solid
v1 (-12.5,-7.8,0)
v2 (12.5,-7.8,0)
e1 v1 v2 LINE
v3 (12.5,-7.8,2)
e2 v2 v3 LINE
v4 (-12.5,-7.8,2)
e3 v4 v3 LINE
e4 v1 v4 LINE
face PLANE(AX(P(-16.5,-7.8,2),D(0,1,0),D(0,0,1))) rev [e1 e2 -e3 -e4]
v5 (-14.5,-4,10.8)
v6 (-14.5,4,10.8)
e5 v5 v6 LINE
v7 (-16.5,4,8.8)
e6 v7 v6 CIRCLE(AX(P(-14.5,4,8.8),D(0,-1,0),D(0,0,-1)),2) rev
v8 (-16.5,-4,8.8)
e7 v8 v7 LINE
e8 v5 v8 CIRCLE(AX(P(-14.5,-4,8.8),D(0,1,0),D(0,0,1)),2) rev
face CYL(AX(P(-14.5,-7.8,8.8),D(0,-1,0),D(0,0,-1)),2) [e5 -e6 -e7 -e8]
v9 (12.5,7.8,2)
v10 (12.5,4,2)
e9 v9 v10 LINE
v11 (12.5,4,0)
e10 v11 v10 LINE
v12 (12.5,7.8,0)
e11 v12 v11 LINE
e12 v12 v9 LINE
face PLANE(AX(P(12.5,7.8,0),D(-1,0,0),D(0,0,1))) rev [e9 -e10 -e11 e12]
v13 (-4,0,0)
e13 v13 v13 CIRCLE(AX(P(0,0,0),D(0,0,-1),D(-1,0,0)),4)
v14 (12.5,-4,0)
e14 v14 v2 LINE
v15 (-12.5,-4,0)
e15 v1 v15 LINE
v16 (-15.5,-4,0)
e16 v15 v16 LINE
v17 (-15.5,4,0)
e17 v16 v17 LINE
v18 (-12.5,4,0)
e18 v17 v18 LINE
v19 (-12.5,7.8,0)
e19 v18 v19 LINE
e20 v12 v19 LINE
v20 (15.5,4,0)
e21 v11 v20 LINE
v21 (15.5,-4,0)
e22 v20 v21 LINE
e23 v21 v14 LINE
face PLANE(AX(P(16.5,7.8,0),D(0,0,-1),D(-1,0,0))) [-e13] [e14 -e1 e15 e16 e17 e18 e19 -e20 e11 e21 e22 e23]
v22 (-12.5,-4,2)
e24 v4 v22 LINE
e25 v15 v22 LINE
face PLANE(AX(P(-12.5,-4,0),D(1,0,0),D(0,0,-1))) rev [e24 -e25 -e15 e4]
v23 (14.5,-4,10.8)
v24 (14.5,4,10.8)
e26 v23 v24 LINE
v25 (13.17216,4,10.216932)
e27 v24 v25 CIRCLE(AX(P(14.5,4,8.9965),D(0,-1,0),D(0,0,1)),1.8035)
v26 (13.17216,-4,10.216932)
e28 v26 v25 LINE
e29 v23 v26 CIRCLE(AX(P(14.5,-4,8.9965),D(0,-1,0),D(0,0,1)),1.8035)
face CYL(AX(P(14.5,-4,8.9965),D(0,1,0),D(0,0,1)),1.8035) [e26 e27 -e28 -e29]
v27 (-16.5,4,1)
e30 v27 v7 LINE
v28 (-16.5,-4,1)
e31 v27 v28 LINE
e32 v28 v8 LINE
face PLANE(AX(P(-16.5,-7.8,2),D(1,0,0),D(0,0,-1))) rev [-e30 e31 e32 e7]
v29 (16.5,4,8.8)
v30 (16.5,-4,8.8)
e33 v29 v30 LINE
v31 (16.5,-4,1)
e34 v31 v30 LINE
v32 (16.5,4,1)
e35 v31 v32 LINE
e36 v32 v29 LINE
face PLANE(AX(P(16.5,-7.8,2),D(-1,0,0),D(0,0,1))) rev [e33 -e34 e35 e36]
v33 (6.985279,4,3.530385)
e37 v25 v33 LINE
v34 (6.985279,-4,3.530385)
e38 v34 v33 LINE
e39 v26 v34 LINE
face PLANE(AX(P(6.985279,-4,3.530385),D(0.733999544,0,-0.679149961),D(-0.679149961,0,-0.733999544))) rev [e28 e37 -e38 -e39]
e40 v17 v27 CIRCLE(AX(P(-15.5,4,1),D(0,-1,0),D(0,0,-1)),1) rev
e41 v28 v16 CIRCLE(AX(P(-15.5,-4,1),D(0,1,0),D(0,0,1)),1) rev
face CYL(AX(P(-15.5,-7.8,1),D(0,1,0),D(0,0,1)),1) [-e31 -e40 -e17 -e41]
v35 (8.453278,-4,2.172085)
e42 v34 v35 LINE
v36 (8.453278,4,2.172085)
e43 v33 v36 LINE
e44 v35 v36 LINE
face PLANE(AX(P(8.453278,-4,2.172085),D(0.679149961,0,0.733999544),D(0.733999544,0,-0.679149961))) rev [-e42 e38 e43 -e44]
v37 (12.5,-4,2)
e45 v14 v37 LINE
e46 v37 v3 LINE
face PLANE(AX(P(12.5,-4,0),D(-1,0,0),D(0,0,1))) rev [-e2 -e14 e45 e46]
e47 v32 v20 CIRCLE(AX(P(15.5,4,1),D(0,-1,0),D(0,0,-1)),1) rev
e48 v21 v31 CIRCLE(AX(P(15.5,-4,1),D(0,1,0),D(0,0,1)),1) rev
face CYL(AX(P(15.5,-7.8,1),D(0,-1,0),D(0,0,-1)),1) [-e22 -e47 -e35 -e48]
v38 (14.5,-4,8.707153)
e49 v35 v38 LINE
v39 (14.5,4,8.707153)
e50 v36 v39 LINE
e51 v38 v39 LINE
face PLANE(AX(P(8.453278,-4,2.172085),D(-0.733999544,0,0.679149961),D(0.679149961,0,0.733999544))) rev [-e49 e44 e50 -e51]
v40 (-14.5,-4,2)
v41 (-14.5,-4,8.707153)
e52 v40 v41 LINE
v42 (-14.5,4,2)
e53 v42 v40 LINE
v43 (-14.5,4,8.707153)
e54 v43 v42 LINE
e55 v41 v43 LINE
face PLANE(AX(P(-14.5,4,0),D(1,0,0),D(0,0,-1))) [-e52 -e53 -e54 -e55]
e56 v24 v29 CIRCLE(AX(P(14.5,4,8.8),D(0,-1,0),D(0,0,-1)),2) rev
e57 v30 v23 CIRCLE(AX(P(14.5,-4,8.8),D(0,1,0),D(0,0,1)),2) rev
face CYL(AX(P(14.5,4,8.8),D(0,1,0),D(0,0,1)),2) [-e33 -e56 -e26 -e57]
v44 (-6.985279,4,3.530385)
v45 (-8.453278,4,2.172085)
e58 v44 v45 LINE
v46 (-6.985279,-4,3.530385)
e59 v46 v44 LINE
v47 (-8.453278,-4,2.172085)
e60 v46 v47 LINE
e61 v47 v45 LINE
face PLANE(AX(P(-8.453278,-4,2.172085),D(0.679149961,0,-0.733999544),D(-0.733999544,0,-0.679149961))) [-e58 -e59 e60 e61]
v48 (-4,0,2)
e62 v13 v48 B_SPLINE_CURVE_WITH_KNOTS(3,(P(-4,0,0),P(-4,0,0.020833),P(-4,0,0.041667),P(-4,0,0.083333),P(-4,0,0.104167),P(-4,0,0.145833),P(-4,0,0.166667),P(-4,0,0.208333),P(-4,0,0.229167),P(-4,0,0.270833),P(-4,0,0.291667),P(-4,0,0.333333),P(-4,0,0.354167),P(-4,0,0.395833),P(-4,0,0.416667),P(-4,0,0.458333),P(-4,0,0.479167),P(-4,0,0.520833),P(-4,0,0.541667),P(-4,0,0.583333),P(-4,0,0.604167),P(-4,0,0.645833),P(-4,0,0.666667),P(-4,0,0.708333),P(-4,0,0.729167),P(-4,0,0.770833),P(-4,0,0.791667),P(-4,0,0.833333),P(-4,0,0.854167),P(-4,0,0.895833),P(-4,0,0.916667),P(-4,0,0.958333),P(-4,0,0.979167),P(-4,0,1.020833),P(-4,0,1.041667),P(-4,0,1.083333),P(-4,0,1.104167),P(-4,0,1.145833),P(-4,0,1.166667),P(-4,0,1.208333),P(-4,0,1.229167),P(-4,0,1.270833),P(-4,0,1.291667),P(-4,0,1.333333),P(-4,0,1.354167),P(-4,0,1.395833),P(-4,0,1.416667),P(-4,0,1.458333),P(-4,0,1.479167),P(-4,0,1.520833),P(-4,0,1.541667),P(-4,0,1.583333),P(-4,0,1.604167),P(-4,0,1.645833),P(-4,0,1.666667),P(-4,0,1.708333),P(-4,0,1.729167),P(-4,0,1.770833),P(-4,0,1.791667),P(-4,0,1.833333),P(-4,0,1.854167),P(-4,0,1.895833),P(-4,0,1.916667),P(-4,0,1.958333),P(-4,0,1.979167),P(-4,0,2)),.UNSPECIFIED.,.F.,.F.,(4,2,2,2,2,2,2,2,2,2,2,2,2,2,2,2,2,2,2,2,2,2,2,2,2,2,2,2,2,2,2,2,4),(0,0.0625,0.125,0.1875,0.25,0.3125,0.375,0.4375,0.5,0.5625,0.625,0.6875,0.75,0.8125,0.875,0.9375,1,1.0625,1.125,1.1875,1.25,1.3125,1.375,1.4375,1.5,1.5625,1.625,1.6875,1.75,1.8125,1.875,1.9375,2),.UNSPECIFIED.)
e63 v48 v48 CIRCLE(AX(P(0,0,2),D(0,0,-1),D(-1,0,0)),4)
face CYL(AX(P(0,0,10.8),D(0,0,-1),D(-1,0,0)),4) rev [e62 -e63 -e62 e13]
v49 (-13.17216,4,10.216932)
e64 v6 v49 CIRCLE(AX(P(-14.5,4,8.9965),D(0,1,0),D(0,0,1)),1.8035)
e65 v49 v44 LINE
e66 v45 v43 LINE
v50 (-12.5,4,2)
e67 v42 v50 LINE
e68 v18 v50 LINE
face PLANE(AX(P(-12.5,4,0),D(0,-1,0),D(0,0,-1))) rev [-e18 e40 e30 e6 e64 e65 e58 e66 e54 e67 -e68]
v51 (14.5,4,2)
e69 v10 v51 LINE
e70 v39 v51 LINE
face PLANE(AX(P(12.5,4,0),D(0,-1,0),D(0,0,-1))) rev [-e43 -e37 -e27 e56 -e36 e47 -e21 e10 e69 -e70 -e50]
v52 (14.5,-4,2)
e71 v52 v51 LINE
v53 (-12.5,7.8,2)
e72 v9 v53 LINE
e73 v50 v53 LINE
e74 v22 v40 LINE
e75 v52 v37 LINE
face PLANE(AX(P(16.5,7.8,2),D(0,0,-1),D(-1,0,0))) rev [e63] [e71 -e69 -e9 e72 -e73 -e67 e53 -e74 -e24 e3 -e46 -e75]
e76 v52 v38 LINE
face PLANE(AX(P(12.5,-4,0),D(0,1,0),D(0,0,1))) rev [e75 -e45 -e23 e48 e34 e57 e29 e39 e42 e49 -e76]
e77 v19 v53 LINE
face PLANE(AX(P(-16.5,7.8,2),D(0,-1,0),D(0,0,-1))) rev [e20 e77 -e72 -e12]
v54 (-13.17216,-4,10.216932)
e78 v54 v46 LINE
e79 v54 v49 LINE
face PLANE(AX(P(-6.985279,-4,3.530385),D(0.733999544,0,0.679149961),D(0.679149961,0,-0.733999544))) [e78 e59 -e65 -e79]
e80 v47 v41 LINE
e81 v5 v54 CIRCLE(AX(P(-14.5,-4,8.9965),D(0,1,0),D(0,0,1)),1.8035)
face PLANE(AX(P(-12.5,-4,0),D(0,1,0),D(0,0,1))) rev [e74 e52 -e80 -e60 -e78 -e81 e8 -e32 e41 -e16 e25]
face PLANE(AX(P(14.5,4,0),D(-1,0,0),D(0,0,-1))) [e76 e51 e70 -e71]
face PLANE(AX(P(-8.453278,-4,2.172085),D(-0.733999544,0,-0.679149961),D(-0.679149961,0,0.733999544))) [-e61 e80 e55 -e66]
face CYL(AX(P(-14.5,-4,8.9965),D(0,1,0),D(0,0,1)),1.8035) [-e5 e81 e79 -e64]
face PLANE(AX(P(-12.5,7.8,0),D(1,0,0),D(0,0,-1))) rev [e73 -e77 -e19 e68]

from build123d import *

# Parameters (mm, degrees)
SKETCH_1_W          = 33
SKETCH_1_H          = 15.6
EXTRUDE_1_DEPTH     = 2
SKETCH_2_W          = 4
SKETCH_2_H          = 3.8
CUT_EXTRUDE_1_DEPTH = 19.360010893
SKETCH_4_W          = 10.8
SKETCH_4_H          = 8
EXTRUDE_2_DEPTH     = 2
EXTRUDE_4_DEPTH     = 8
SKETCH_6_R          = 4
CUT_EXTRUDE_2_DEPTH = 22.20683852
FILLET_1_R          = 2
FILLET_2_R          = 1


with BuildPart() as part:
    # 草图1 → 凸台-拉伸1 (new body)
    with BuildSketch(Plane.XY):
        Rectangle(SKETCH_1_W, SKETCH_1_H)
    extrude(amount=EXTRUDE_1_DEPTH)

    # 草图2 → 切除-拉伸1 (cut, through all)
    with BuildSketch(Plane.XY.offset(2)):
        with Locations((-14.5, 5.9)):
            Rectangle(SKETCH_2_W, SKETCH_2_H)
        with Locations((14.5, 5.9)):
            Rectangle(SKETCH_2_W, SKETCH_2_H)
        with Locations((-14.5, -5.9)):
            Rectangle(SKETCH_2_W, SKETCH_2_H)
        with Locations((14.5, -5.9)):
            Rectangle(SKETCH_2_W, SKETCH_2_H)
    extrude(amount=-CUT_EXTRUDE_1_DEPTH, mode=Mode.SUBTRACT)

    # 草图4 → 凸台-拉伸2 (add)
    with BuildSketch(Plane.ZY.offset(16.5)):
        with Locations((5.4, 0)):
            Rectangle(SKETCH_4_W, SKETCH_4_H)
    extrude_2 = extrude(amount=-EXTRUDE_2_DEPTH)

    # 草图5 → 凸台-拉伸4 (add)
    with BuildSketch(Plane(origin=(0, 4, 0), x_dir=(1, 0, 0), z_dir=(0, 1, 0))):
        with BuildLine():
            Line((-8.45327815, -2.172085136), (-14.5, -8.707152989))
            Line((-14.5, -8.707152989), (-14.5, -10.8))
            ThreePointArc((-14.5, -10.8), (-13.774891977, -10.64781178), (-13.172160334, -10.216931904))
            Line((-13.172160334, -10.216931904), (-6.985279062, -3.530385058))
            Line((-6.985279062, -3.530385058), (-8.45327815, -2.172085136))
        make_face()
    extrude_4 = extrude(amount=-EXTRUDE_4_DEPTH)

    # 草图6 → 切除-拉伸2 (cut, through all)
    with BuildSketch(Plane(origin=(0, 0, 0), x_dir=(-1, 0, 0), z_dir=(0, 0, -1))):
        Circle(SKETCH_6_R)
    extrude(amount=-CUT_EXTRUDE_2_DEPTH, mode=Mode.SUBTRACT)

    # 镜向2: 凸台-拉伸2 across plane
    add(extrude_2.mirror(Plane(origin=(0, 0, 0), x_dir=(0, 0, 1), z_dir=(1, 0, 0))))

    # 镜向3: 凸台-拉伸4 across plane
    add(extrude_4.mirror(Plane(origin=(0, 0, 0), x_dir=(0, 0, 1), z_dir=(1, 0, 0))))

    # 圆角1
    fillet_1_edges = [part.edges().sort_by_distance(p)[0] for p in [
        (16.5, 0, 10.8),
        (-16.5, 0, 10.8),
    ]]
    fillet(fillet_1_edges, radius=FILLET_1_R - 0.0001)  # a hair under: the kernel refuses the full size

    # 圆角2
    fillet_2_edges = [part.edges().sort_by_distance(p)[0] for p in [
        (-16.5, 0, 0),
        (16.5, 0, 0),
    ]]
    fillet(fillet_2_edges, radius=FILLET_2_R)


solid = part.part
